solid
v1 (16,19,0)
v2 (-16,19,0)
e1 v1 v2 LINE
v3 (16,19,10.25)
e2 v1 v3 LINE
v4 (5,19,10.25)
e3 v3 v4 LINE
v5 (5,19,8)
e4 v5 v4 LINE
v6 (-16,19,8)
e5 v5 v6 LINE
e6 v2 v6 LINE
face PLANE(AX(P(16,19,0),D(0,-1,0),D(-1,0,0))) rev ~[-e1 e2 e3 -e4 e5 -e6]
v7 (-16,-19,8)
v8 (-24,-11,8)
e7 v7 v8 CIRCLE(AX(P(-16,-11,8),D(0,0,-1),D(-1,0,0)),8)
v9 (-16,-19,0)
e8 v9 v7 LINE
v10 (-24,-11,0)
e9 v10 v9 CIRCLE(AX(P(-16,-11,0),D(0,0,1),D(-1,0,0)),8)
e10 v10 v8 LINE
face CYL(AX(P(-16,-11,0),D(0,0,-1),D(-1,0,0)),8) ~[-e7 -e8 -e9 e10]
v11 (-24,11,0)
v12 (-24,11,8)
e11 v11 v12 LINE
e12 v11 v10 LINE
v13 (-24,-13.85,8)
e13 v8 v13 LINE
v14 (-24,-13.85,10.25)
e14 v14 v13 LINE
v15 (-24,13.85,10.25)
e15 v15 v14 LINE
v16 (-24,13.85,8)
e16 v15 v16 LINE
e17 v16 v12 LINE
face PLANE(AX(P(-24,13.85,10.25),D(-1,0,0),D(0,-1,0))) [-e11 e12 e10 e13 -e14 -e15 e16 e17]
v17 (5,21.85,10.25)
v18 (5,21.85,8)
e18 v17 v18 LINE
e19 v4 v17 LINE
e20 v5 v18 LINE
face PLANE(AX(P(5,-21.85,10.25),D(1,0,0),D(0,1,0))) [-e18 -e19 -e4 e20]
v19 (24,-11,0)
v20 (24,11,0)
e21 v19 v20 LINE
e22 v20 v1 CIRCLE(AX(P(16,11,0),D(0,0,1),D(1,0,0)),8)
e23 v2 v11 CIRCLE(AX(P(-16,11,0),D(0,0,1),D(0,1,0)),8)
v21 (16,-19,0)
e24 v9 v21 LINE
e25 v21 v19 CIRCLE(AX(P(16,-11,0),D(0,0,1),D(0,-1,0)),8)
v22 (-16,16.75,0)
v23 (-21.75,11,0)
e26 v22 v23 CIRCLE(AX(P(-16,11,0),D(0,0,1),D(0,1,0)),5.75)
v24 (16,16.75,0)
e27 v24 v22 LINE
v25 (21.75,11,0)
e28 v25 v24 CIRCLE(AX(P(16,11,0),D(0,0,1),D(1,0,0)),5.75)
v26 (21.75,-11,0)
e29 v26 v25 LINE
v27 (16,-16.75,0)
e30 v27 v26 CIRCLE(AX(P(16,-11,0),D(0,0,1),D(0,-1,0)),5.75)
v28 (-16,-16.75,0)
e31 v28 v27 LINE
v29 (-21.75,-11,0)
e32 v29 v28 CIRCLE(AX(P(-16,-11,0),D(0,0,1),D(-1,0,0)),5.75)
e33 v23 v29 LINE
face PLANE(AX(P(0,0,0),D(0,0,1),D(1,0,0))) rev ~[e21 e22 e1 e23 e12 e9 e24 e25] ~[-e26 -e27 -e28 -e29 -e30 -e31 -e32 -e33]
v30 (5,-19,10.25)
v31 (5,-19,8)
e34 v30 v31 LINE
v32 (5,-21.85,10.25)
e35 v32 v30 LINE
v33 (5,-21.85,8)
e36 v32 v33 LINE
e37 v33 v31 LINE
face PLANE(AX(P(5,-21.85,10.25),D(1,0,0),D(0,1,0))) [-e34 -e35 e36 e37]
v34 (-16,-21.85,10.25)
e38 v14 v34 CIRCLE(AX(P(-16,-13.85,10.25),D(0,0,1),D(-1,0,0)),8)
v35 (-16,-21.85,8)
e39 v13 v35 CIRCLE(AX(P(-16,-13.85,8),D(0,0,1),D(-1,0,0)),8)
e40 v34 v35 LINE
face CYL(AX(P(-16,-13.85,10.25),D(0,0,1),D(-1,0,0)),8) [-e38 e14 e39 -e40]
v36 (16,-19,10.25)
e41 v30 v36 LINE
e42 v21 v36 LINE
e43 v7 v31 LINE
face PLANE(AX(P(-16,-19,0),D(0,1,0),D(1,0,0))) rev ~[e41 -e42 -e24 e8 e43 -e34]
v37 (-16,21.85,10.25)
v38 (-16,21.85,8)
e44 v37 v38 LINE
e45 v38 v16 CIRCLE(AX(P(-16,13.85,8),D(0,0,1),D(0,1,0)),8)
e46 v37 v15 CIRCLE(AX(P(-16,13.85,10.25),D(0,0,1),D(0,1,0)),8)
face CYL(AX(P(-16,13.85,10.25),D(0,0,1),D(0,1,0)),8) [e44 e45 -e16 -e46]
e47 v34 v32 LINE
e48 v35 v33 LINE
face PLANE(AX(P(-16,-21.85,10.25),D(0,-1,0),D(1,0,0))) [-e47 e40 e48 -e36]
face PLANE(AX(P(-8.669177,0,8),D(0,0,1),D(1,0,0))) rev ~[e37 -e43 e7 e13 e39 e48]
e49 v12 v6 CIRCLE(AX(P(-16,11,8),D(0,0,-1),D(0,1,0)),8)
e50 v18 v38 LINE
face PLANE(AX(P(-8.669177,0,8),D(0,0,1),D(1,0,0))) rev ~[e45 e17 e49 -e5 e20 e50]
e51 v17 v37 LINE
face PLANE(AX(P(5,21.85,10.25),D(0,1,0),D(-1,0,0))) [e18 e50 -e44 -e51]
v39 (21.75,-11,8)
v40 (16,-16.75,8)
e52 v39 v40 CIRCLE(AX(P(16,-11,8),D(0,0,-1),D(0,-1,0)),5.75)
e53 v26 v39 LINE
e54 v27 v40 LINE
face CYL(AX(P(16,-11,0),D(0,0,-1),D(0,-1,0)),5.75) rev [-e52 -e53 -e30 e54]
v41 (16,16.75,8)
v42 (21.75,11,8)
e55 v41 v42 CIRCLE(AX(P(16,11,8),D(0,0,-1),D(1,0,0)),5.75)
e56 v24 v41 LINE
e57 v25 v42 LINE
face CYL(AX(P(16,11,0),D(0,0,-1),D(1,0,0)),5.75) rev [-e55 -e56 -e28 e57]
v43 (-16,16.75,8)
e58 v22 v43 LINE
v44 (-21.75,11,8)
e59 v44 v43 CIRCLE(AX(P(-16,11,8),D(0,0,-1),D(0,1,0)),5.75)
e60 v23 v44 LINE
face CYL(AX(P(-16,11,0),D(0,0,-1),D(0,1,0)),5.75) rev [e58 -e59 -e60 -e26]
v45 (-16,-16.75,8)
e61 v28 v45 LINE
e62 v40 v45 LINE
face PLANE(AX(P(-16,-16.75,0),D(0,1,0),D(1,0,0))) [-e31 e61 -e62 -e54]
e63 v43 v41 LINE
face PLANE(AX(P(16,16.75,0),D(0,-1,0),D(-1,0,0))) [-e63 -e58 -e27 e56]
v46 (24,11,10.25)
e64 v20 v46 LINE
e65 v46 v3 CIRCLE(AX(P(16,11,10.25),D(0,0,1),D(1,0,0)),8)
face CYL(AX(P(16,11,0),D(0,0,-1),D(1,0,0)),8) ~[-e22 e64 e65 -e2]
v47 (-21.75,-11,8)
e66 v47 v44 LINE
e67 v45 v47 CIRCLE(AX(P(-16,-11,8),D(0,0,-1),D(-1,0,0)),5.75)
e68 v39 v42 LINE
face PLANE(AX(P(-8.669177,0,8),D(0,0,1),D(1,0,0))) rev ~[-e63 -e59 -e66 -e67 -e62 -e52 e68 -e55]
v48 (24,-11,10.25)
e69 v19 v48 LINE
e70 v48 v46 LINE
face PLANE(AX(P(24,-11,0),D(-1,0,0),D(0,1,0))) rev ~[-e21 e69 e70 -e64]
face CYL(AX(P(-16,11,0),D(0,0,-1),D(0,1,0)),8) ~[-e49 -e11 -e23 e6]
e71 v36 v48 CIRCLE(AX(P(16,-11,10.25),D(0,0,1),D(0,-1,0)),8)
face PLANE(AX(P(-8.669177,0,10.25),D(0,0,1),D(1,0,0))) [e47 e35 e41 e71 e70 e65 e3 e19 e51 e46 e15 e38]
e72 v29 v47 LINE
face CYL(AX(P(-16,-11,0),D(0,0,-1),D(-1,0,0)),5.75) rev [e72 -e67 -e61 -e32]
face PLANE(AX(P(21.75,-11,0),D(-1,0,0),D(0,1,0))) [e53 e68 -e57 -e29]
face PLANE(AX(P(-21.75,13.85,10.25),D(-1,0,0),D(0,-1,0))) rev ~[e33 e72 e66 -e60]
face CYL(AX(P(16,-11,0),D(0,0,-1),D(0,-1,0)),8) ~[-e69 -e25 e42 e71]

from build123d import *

# Parameters (mm, degrees)
F1_DEPTH     = 10.25
F3_DEPTH     = 2.25
F4_T         = 2.25
F4_T3_DEPTH  = 25.5
F4_T5_DEPTH  = 6.75
F4_T8_ANGLE  = 90.000000001
F4_T10_ANGLE = 90.000000001


# Not quite as in the source:
# - a shell that OpenCascade refuses in one call is made with other operations: the cavity is built on its own and cut out


with BuildPart() as f1:
    # F0 (on Top) → F1 (new body)
    with BuildSketch(Plane.XY):
        with BuildLine():
            Line((16, 19), (-16, 19))
            ThreePointArc((-16, 19), (-21.6568542495, 16.6568542495), (-24, 11))
            Line((-24, 11), (-24, -11))
            ThreePointArc((-24, -11), (-21.6568542495, -16.6568542495), (-16, -19))
            Line((-16, -19), (16, -19))
            ThreePointArc((16, -19), (21.6568542495, -16.6568542495), (24, -11))
            Line((24, -11), (24, 11))
            ThreePointArc((24, 11), (21.6568542495, 16.6568542495), (16, 19))
        make_face()
    extrude(amount=F1_DEPTH)

    # F2 (on face) → F3 (join)
    with BuildSketch(Plane.XY.offset(10.25)):
        with BuildLine():
            Line((5, 21.85), (-16, 21.85))
            ThreePointArc((-16, 21.85), (-21.6568542495, 19.5068542495), (-24, 13.85))
            Line((-24, 13.85), (-24, -13.85))
            ThreePointArc((-24, -13.85), (-21.6568542495, -19.5068542495), (-16, -21.85))
            Line((-16, -21.85), (5, -21.85))
            Line((5, -21.85), (5, 21.85))
        make_face()
    extrude(amount=-F3_DEPTH)

    # F4: shell of thickness 2.25, made by hand


with BuildPart() as f4_core1:
    # F4_t2: copy of F1
    add(f1.part)

    # the walls: a layer under each face that stays
    f4_faces = [f4_core1.faces().sort_by_distance(p)[0] for p in [
        (0, 19, 5.125),
        (21.6568542495, 16.6568542495, 5.125),
        (24, 0, 5.125),
        (21.6568542495, -16.6568542495, 5.125),
        (0, -19, 5.125),
        (-21.6568542495, -16.6568542495, 4),
        (-24, 0, 5.125),
        (-21.6568542495, -19.5068542495, 9.125),
        (-5.5, -21.85, 9.125),
        (-21.6568542495, 19.5068542495, 9.125),
        (-5.5, 21.85, 9.125),
        (-19.1666666667, -20.0416666667, 8),
        (5, -20.425, 9.125),
        (0, 0, 10.25),
        (5, 20.425, 9.125),
        (-19.1666666667, 20.0416666667, 8),
        (-21.6568542495, 16.6568542495, 4),
    ]]
    thicken(f4_faces, amount=-F4_T, mode=Mode.SUBTRACT)

    # F4_s4 → F4_t3 (cut)
    with BuildSketch(Plane.YZ.offset(-18.25)):
        Polygon((19.0225, 7.9775), (16.75, 8), (16.75, 10.25), (19, 10.25), align=None)
        Polygon((-19.0225, 7.9775), (-16.75, 8), (-16.75, 10.25), (-19, 10.25), align=None)
    extrude(amount=F4_T3_DEPTH, mode=Mode.SUBTRACT)

    # F4_s6 → F4_t5 (cut)
    with BuildSketch(Plane.XY.offset(5.75)):
        Polygon((5.0225, 19.0225), (5, 16.75), (2.75, 16.75), (2.75, 19), align=None)
        Polygon((5.0225, -19.0225), (5, -16.75), (2.75, -16.75), (2.75, -19), align=None)
    extrude(amount=F4_T5_DEPTH, mode=Mode.SUBTRACT)

    # F4_s7 → F4_t8 (revolve, cut)
    with BuildSketch(Plane.YZ.offset(-16)):
        Polygon((-19.0225, 7.9775), (-16.75, 8), (-16.75, 10.25), (-19, 10.25), align=None)
    revolve(axis=Axis((-16, -11, 8), (0, 0, -1)), revolution_arc=F4_T8_ANGLE, mode=Mode.SUBTRACT)

    # F4_s9 → F4_t10 (revolve, cut)
    with BuildSketch(Plane.XZ.offset(-11)):
        Polygon((-24.0225, 7.9775), (-24, 10.25), (-21.75, 10.25), (-21.75, 8), align=None)
    revolve(axis=Axis((-16, 11, 8), (0, 0, -1)), revolution_arc=F4_T10_ANGLE, mode=Mode.SUBTRACT)


with BuildPart() as f1_1:
    add(f1.part)

    # what is left inside the walls is the cavity
    f4_cavity = [f4_core1.part.solids().sort_by_distance(p)[0] for p in [
        (0, -5.583333, 7.9775),
    ]]
    add(f4_cavity, mode=Mode.SUBTRACT)


solid = f1_1.part
